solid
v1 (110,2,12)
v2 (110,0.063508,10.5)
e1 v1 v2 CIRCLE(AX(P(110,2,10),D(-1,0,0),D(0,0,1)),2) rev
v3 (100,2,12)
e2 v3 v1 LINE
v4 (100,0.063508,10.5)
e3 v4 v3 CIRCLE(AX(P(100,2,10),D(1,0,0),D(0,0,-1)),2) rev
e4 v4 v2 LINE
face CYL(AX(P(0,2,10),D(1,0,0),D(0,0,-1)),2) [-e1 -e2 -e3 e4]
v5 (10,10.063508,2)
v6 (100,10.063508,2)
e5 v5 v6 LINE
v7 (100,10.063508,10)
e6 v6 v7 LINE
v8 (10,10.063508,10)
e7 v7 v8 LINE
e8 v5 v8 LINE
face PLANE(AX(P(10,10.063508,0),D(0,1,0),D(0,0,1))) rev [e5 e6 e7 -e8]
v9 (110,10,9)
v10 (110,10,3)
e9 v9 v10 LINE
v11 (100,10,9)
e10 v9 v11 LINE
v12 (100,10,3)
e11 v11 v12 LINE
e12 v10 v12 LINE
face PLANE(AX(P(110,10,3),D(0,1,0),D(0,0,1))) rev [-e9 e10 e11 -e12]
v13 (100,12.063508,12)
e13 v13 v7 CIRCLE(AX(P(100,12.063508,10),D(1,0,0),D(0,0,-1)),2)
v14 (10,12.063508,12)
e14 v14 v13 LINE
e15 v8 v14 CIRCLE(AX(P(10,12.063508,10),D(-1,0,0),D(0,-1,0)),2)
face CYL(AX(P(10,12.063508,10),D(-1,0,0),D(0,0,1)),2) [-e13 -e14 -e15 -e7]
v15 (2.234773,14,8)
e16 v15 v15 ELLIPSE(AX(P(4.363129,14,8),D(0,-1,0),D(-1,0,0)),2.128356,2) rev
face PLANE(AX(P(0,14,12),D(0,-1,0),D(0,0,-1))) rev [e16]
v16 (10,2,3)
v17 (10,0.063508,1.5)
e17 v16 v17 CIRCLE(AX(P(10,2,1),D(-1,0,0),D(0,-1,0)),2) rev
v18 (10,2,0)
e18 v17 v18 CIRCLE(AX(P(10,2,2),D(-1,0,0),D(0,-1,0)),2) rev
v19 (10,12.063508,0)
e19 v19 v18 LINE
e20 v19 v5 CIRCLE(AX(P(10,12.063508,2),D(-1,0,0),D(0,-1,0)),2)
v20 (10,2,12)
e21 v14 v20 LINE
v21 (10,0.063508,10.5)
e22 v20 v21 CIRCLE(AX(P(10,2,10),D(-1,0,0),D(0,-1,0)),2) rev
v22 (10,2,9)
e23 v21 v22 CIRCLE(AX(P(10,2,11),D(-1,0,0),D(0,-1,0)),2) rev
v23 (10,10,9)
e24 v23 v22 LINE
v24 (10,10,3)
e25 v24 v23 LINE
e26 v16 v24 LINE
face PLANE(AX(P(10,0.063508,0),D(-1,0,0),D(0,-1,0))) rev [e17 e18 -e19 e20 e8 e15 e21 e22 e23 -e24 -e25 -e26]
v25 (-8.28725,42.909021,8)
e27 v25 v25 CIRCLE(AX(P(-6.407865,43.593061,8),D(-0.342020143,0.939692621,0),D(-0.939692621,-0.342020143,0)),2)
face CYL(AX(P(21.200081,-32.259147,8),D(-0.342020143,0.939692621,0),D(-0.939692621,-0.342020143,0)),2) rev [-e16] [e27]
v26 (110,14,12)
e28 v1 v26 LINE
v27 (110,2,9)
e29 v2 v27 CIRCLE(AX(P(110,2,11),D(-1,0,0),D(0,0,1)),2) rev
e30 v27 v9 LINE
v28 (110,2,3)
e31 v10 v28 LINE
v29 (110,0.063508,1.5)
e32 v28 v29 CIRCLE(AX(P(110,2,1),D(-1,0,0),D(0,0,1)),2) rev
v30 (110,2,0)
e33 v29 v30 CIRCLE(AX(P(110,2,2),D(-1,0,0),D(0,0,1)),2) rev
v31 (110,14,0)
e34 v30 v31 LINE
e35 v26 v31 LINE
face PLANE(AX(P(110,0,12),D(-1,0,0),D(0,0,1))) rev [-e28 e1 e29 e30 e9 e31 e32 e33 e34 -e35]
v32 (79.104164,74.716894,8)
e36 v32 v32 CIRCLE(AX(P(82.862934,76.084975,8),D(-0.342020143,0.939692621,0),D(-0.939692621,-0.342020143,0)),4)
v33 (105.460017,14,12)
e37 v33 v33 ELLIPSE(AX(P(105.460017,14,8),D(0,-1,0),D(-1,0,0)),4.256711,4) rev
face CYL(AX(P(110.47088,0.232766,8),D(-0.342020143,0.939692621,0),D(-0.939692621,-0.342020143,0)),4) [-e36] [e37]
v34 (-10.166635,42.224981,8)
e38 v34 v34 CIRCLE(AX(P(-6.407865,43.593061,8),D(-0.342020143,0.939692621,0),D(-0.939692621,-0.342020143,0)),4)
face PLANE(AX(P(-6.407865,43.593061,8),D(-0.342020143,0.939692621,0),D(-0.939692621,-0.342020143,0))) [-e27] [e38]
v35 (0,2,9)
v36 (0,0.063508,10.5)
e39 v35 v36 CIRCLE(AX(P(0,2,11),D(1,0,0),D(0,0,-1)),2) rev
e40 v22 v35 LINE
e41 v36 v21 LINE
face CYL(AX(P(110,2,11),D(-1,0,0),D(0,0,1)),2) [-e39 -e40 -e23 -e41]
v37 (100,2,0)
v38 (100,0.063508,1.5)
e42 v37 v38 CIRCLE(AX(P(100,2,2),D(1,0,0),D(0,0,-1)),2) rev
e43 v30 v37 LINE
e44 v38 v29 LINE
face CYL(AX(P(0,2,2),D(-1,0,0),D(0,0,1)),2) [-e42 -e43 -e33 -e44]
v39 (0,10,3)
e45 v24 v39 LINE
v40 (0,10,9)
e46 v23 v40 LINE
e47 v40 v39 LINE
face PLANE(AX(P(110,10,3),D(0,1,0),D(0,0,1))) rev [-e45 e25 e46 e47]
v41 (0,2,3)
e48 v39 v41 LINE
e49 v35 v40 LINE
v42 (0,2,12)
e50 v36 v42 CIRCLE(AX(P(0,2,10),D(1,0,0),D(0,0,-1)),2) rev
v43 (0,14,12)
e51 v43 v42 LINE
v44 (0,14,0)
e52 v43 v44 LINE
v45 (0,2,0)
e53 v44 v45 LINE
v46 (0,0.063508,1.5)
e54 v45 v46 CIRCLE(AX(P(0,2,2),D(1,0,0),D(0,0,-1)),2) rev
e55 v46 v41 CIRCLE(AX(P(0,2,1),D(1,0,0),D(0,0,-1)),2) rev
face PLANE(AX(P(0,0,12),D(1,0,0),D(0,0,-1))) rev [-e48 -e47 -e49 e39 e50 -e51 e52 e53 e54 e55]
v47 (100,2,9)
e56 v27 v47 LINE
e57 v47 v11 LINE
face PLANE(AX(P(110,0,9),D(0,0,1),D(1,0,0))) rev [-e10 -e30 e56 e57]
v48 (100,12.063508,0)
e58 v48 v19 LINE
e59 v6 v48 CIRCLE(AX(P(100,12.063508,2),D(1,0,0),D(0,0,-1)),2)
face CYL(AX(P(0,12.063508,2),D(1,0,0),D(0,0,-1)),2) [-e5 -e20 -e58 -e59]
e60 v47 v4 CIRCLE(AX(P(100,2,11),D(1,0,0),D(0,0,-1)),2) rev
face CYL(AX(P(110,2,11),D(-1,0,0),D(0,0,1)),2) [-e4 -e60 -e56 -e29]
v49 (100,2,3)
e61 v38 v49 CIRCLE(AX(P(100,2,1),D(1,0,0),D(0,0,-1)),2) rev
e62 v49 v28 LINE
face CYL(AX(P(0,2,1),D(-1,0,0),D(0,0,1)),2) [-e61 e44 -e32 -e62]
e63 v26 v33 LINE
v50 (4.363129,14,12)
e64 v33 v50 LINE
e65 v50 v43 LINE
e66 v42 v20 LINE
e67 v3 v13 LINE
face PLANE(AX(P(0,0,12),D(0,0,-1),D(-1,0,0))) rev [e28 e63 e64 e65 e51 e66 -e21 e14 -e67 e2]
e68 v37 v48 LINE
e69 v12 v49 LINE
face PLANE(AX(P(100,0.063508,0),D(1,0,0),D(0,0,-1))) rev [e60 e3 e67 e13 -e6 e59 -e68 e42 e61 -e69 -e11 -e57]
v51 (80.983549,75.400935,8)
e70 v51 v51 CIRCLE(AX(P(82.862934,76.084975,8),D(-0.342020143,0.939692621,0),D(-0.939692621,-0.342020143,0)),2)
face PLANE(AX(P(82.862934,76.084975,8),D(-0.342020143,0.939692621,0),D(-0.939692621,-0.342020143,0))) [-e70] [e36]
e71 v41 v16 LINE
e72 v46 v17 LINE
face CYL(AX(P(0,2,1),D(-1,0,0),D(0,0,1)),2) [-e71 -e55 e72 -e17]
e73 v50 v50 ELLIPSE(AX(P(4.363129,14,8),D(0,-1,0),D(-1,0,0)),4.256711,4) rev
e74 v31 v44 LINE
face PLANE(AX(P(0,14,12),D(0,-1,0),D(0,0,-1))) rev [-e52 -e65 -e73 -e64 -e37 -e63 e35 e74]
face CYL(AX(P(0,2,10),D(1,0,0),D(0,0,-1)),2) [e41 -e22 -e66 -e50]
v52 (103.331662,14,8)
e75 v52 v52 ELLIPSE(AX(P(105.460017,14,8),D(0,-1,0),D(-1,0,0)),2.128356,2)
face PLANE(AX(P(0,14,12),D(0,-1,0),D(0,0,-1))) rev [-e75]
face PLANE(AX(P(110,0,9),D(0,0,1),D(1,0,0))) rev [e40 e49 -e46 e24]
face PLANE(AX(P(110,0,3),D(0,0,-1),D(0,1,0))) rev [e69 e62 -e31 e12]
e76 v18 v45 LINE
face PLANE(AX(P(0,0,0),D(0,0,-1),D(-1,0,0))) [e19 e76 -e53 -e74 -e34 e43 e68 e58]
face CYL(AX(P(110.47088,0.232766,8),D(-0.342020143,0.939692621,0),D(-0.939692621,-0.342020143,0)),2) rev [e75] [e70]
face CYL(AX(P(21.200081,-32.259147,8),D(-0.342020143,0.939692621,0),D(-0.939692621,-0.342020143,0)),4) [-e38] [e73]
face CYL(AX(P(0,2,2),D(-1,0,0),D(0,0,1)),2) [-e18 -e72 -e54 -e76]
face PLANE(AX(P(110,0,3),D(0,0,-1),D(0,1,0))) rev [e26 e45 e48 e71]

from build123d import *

# Parameters (mm, degrees)
ESQUISSE1_W                    = 110
ESQUISSE1_H                    = 14
BOSS_EXTRU_1_DEPTH             = 12
ESQUISSE2_W                    = 6
ESQUISSE2_H                    = 10
ENL_V_MAT_EXTRU_1_DEPTH        = 112.534747949
CONG_1_R                       = 2
ESQUISSE3_W                    = 90
ESQUISSE3_H                    = 10
ENL_V_MAT_EXTRU_2_DEPTH        = 12
CONG_2_R                       = 2
ESQUISSE6_R                    = 4
ESQUISSE6_R_2                  = 2
BOSS_EXTRU_2_DEPTH             = 30
BOSS_EXTRU_2_DIRECTION_2_REACH = 117.782


with BuildPart() as part:
    # Esquisse1 → Boss.-Extru.1 (new body)
    with BuildSketch(Plane.XY):
        with Locations((55, 7)):
            Rectangle(ESQUISSE1_W, ESQUISSE1_H)
    extrude(amount=BOSS_EXTRU_1_DEPTH)

    # Esquisse2 → Enlèv. mat.-Extru.1 (cut, through all)
    with BuildSketch(Plane.ZY):
        with Locations((6, 5)):
            Rectangle(ESQUISSE2_W, ESQUISSE2_H)
    extrude(amount=-ENL_V_MAT_EXTRU_1_DEPTH, mode=Mode.SUBTRACT)

    # Congé1
    # the kernel refuses this fillet: 2 mm, written as the material it takes off along each edge
    with BuildSketch(Plane(origin=(-5, 0, 12), x_dir=(0, 1, 0), z_dir=(1, 0, 0)), Plane(origin=(-5, 0, 9), x_dir=(0, 0, 1), z_dir=(1, 0, 0)), Plane(origin=(-5, 0, 0), x_dir=(0, 0, 1), z_dir=(1, 0, 0))) as cong_1_piece_1:
        with BuildLine():
            CenterArc((CONG_1_R, -CONG_1_R), CONG_1_R, 90, 90)
            Line((0, -CONG_1_R), (0, 0))
            Line((0, 0), (CONG_1_R, 0))
        make_face()
    extrude(amount=120, mode=Mode.SUBTRACT)
    with BuildSketch(Plane(origin=(-5, 0, 3), x_dir=(0, 0, -1), z_dir=(1, 0, 0))) as cong_1_piece_2:
        with BuildLine():
            CenterArc((CONG_1_R, CONG_1_R), CONG_1_R, 180, 90)
            Line((0, CONG_1_R), (0, 0))
            Line((0, 0), (CONG_1_R, 0))
        make_face()
    extrude(amount=120, mode=Mode.SUBTRACT)

    # Esquisse3 → Enlèv. mat.-Extru.2 (cut)
    with BuildSketch(Plane.XY.offset(12)):
        with Locations((55, 5.063508327)):
            Rectangle(ESQUISSE3_W, ESQUISSE3_H)
    extrude(amount=-ENL_V_MAT_EXTRU_2_DEPTH, mode=Mode.SUBTRACT)

    # Congé2
    cong_2_edges = [part.edges().sort_by_distance(p)[0] for p in [
        (55, 10.063508327, 12),
        (55, 10.063508327, 0),
    ]]
    fillet(cong_2_edges, radius=CONG_2_R)

    # Esquisse6 → Boss.-Extru.2 (add)
    # profile 1 of 2: a face of its own
    with BuildSketch(Plane(origin=(-4.499513268, 12.362311102, 0), x_dir=(0, 0, -1), z_dir=(-0.34202014332565694, 0.9396926207859128, 0))):
        with Locations(Location((-8, -8.888282007, 0), (0, 0, 90))):
            Circle(ESQUISSE6_R)
        with Locations(Location((-8, -8.888282007, 0), (0, 0, 90))):
            Circle(ESQUISSE6_R_2, mode=Mode.SUBTRACT)
    # profile 2 of 2: a face of its own
    with BuildSketch(Plane(origin=(-4.499513268, 12.362311102, 0), x_dir=(0, 0, -1), z_dir=(-0.34202014332565694, 0.9396926207859128, 0))):
        with Locations(Location((-8, -103.888282007, 0), (0, 0, 90))):
            Circle(ESQUISSE6_R)
        with Locations(Location((-8, -103.888282007, 0), (0, 0, 90))):
            Circle(ESQUISSE6_R_2, mode=Mode.SUBTRACT)
    extrude(amount=BOSS_EXTRU_2_DEPTH)

    # Esquisse6 → Boss.-Extru.2 direction 2 (add, up to next)
    with BuildSketch(Plane(origin=(-4.499513268, 12.362311102, 0), x_dir=(0, 0, -1), z_dir=(-0.34202014332565694, 0.9396926207859128, 0)), mode=Mode.PRIVATE) as boss_extru_2_direction_2_sk1:
        with Locations(Location((-8, -8.888282007, 0), (0, 0, 90))):
            Circle(ESQUISSE6_R)
        with Locations(Location((-8, -8.888282007, 0), (0, 0, 90))):
            Circle(ESQUISSE6_R_2, mode=Mode.SUBTRACT)
    boss_extru_2_direction_2_tool1 = extrude(boss_extru_2_direction_2_sk1.sketch, amount=-BOSS_EXTRU_2_DIRECTION_2_REACH, mode=Mode.PRIVATE) - part.part
    # Esquisse6 → Boss.-Extru.2 direction 2 (add, up to next)
    with BuildSketch(Plane(origin=(-4.499513268, 12.362311102, 0), x_dir=(0, 0, -1), z_dir=(-0.34202014332565694, 0.9396926207859128, 0)), mode=Mode.PRIVATE) as boss_extru_2_direction_2_sk2:
        with Locations(Location((-8, -103.888282007, 0), (0, 0, 90))):
            Circle(ESQUISSE6_R)
        with Locations(Location((-8, -103.888282007, 0), (0, 0, 90))):
            Circle(ESQUISSE6_R_2, mode=Mode.SUBTRACT)
    boss_extru_2_direction_2_tool2 = extrude(boss_extru_2_direction_2_sk2.sketch, amount=-BOSS_EXTRU_2_DIRECTION_2_REACH, mode=Mode.PRIVATE) - part.part
    add(boss_extru_2_direction_2_tool1.solids().sort_by_distance((7.505196, 16.731668, 8))[0])
    add(boss_extru_2_direction_2_tool2.solids().sort_by_distance((96.775995, 49.223582, 8))[0])


solid = part.part
